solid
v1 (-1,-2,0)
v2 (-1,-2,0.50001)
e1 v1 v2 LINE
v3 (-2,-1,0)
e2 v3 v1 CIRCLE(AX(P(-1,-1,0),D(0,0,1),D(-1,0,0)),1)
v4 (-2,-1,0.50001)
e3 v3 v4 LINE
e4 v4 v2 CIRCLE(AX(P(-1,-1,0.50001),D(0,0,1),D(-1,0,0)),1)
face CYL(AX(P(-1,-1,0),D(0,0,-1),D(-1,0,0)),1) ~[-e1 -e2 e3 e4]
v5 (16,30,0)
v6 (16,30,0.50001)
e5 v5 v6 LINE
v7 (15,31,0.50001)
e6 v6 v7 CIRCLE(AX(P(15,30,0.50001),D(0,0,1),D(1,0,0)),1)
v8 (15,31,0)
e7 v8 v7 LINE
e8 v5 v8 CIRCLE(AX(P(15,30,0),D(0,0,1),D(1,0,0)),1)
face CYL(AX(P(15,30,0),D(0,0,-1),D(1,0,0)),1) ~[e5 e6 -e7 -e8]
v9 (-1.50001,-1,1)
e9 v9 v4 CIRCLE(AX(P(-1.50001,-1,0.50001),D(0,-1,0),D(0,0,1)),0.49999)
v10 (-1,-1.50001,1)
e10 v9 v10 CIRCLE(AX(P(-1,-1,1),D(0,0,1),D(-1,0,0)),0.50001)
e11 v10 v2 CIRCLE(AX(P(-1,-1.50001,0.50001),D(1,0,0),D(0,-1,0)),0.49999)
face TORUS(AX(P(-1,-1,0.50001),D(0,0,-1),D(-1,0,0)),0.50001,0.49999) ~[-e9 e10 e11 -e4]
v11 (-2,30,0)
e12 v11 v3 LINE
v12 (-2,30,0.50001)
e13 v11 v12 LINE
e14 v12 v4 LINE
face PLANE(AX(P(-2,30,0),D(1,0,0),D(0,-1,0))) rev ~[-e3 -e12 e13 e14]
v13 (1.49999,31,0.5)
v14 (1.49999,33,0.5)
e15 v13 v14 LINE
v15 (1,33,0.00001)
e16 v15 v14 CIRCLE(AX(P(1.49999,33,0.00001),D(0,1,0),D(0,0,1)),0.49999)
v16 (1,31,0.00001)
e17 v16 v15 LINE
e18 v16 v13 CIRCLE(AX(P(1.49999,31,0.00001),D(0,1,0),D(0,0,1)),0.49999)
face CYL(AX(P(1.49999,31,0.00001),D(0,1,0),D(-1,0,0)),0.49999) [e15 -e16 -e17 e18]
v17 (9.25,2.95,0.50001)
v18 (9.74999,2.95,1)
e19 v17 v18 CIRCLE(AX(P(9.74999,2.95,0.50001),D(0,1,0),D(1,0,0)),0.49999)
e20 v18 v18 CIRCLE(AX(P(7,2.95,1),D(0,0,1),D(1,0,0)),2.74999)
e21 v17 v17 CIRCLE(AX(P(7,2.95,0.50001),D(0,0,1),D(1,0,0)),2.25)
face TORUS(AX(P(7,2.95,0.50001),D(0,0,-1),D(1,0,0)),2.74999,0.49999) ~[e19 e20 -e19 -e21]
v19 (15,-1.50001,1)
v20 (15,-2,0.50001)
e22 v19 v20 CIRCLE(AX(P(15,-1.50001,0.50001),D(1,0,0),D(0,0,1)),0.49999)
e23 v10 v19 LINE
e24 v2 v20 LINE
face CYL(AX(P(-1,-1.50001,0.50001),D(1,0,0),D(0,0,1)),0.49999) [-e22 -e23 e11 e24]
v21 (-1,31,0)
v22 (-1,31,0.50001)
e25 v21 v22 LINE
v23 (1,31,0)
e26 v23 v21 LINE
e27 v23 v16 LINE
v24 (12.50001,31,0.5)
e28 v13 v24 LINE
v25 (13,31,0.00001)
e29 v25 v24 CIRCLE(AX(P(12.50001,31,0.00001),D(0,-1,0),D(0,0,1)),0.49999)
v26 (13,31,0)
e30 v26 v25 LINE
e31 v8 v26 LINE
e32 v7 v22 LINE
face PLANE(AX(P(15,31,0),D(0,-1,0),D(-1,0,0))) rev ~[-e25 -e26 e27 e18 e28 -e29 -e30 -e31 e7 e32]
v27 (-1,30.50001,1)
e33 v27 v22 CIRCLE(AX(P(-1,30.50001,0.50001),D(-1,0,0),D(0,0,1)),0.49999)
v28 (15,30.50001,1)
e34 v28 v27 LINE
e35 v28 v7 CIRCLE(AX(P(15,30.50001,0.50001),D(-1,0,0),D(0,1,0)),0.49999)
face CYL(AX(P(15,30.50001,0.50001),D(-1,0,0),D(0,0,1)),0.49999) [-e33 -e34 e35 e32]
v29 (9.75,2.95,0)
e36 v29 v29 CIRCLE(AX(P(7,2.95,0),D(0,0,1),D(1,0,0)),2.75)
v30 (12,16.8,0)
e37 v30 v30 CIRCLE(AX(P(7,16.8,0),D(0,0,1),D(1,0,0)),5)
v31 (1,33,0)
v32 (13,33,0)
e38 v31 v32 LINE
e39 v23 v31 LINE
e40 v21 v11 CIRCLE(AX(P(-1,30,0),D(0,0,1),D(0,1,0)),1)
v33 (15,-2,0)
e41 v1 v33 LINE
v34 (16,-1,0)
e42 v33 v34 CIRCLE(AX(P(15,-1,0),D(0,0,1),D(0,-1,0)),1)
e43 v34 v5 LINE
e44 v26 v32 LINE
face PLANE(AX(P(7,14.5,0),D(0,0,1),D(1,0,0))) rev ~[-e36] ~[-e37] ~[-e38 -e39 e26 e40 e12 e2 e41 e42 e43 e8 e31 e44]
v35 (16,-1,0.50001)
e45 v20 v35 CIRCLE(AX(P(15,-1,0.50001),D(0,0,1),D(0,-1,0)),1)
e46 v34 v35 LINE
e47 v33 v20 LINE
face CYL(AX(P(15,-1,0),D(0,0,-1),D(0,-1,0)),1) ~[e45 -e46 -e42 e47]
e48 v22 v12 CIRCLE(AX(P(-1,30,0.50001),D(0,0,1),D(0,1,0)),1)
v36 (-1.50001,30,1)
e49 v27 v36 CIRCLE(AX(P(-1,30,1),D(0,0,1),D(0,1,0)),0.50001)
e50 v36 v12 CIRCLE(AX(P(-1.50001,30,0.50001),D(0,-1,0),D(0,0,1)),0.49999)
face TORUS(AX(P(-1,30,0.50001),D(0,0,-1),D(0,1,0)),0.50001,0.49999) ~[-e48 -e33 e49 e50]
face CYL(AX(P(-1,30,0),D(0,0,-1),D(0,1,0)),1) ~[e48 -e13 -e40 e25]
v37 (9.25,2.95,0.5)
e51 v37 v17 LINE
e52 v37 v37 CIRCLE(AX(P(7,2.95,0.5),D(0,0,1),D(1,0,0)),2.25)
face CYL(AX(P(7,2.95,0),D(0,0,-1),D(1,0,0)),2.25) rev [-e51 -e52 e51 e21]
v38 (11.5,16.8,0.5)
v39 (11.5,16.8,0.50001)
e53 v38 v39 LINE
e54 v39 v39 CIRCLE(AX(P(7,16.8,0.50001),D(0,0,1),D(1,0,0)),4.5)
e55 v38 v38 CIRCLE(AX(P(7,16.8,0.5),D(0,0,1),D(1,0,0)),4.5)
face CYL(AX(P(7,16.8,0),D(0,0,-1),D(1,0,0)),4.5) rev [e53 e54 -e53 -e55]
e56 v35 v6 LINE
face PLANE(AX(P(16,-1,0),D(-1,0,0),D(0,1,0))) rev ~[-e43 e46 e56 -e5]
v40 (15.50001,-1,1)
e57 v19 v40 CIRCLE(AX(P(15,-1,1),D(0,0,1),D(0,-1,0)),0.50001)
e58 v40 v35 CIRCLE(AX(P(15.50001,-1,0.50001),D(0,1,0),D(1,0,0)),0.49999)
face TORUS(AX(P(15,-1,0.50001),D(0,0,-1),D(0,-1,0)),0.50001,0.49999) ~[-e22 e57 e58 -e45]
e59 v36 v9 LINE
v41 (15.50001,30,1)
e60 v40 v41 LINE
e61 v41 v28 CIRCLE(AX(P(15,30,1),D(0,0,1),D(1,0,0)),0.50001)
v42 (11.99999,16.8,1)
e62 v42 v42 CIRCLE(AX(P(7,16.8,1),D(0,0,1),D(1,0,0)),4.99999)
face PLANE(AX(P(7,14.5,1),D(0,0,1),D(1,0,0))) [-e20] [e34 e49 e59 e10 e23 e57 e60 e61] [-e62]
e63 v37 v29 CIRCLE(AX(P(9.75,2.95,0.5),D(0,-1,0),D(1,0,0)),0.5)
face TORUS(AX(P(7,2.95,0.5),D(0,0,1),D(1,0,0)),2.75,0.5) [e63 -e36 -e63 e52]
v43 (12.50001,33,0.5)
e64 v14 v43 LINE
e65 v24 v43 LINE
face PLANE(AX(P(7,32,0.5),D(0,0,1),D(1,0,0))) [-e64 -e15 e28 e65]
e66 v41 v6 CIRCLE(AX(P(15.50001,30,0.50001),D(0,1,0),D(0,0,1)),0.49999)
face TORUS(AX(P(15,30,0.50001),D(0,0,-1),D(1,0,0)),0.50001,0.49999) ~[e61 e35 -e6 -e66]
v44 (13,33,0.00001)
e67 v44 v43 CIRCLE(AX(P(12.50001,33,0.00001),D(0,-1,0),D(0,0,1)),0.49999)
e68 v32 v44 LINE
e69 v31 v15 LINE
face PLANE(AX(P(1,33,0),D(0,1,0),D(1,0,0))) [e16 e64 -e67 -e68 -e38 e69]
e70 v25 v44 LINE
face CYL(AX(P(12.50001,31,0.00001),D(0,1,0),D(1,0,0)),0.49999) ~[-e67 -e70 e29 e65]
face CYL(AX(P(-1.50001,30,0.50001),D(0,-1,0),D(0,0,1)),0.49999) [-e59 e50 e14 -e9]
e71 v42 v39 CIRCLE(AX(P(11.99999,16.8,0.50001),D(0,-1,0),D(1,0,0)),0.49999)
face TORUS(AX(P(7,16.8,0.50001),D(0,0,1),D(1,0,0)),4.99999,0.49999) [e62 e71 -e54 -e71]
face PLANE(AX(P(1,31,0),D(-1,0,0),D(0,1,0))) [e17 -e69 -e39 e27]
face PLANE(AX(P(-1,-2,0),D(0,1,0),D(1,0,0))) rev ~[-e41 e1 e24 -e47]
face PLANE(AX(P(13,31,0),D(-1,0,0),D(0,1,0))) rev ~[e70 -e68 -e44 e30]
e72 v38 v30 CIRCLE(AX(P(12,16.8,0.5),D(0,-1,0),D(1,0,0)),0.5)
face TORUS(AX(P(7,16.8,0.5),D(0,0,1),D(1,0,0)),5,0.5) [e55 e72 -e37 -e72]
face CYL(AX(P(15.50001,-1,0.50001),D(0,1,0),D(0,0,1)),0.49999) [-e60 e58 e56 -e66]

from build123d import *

# Parameters (mm, degrees)
F0_R     = 2.25
F0_R_2   = 4.5
F1_DEPTH = 1
F2_R     = 0.5
F0_W     = 12
F0_H     = 2
F3_DEPTH = 0.5
F4_R     = 0.49999
F5_R     = 0.49999


# Not quite as in the source:
# - a fillet or chamfer is up to 0.001 mm smaller than in the source, because OpenCascade refuses the exact size


with BuildPart() as f1:
    # F0 (on Top) → F1 (new body)
    with BuildSketch(Plane.XY):
        with BuildLine():
            ThreePointArc((-2, -1), (-1.7071067812, -1.7071067812), (-1, -2))
            Line((-1, -2), (15, -2))
            ThreePointArc((15, -2), (15.7071067812, -1.7071067812), (16, -1))
            Line((16, -1), (16, 30))
            ThreePointArc((16, 30), (15.7071067812, 30.7071067812), (15, 31))
            Line((15, 31), (13, 31))
            Line((13, 31), (1, 31))
            Line((1, 31), (-1, 31))
            ThreePointArc((-1, 31), (-1.7071067812, 30.7071067812), (-2, 30))
            Line((-2, 30), (-2, -1))
        make_face()
        with Locations((7, 2.95)):
            Circle(F0_R, mode=Mode.SUBTRACT)
        with Locations((7, 16.8)):
            Circle(F0_R_2, mode=Mode.SUBTRACT)
    extrude(amount=F1_DEPTH)

    # F2
    f2_edges = [f1.edges().sort_by_distance(p)[0] for p in [
        (2.5, 16.8, 0),
        (4.75, 2.95, 0),
    ]]
    fillet(f2_edges, radius=F2_R)

    # F0 (on Top) → F3 (join)
    with BuildSketch(Plane.XY):
        with Locations((7, 32)):
            Rectangle(F0_W, F0_H)
    extrude(amount=F3_DEPTH)

    # F4 (radius 0.5 in the source; OpenCascade refuses exactly that, so slightly less here)
    f4_edges = [f1.edges().sort_by_distance(p)[0] for p in [
        (-2, 14.5, 1),
        (-1.707107, -1.707107, 1),
        (7, -2, 1),
        (15.707107, -1.707107, 1),
        (16, 14.5, 1),
        (15.707107, 30.707107, 1),
        (7, 31, 1),
        (-1.707107, 30.707107, 1),
        (4.75, 2.95, 1),
        (2.5, 16.8, 1),
    ]]
    fillet(f4_edges, radius=F4_R)

    # F5 (radius 0.5 in the source; OpenCascade refuses exactly that, so slightly less here)
    f5_edges = [f1.edges().sort_by_distance(p)[0] for p in [
        (1, 32, 0.5),
        (13, 32, 0.5),
    ]]
    fillet(f5_edges, radius=F5_R)


solid = f1.part
